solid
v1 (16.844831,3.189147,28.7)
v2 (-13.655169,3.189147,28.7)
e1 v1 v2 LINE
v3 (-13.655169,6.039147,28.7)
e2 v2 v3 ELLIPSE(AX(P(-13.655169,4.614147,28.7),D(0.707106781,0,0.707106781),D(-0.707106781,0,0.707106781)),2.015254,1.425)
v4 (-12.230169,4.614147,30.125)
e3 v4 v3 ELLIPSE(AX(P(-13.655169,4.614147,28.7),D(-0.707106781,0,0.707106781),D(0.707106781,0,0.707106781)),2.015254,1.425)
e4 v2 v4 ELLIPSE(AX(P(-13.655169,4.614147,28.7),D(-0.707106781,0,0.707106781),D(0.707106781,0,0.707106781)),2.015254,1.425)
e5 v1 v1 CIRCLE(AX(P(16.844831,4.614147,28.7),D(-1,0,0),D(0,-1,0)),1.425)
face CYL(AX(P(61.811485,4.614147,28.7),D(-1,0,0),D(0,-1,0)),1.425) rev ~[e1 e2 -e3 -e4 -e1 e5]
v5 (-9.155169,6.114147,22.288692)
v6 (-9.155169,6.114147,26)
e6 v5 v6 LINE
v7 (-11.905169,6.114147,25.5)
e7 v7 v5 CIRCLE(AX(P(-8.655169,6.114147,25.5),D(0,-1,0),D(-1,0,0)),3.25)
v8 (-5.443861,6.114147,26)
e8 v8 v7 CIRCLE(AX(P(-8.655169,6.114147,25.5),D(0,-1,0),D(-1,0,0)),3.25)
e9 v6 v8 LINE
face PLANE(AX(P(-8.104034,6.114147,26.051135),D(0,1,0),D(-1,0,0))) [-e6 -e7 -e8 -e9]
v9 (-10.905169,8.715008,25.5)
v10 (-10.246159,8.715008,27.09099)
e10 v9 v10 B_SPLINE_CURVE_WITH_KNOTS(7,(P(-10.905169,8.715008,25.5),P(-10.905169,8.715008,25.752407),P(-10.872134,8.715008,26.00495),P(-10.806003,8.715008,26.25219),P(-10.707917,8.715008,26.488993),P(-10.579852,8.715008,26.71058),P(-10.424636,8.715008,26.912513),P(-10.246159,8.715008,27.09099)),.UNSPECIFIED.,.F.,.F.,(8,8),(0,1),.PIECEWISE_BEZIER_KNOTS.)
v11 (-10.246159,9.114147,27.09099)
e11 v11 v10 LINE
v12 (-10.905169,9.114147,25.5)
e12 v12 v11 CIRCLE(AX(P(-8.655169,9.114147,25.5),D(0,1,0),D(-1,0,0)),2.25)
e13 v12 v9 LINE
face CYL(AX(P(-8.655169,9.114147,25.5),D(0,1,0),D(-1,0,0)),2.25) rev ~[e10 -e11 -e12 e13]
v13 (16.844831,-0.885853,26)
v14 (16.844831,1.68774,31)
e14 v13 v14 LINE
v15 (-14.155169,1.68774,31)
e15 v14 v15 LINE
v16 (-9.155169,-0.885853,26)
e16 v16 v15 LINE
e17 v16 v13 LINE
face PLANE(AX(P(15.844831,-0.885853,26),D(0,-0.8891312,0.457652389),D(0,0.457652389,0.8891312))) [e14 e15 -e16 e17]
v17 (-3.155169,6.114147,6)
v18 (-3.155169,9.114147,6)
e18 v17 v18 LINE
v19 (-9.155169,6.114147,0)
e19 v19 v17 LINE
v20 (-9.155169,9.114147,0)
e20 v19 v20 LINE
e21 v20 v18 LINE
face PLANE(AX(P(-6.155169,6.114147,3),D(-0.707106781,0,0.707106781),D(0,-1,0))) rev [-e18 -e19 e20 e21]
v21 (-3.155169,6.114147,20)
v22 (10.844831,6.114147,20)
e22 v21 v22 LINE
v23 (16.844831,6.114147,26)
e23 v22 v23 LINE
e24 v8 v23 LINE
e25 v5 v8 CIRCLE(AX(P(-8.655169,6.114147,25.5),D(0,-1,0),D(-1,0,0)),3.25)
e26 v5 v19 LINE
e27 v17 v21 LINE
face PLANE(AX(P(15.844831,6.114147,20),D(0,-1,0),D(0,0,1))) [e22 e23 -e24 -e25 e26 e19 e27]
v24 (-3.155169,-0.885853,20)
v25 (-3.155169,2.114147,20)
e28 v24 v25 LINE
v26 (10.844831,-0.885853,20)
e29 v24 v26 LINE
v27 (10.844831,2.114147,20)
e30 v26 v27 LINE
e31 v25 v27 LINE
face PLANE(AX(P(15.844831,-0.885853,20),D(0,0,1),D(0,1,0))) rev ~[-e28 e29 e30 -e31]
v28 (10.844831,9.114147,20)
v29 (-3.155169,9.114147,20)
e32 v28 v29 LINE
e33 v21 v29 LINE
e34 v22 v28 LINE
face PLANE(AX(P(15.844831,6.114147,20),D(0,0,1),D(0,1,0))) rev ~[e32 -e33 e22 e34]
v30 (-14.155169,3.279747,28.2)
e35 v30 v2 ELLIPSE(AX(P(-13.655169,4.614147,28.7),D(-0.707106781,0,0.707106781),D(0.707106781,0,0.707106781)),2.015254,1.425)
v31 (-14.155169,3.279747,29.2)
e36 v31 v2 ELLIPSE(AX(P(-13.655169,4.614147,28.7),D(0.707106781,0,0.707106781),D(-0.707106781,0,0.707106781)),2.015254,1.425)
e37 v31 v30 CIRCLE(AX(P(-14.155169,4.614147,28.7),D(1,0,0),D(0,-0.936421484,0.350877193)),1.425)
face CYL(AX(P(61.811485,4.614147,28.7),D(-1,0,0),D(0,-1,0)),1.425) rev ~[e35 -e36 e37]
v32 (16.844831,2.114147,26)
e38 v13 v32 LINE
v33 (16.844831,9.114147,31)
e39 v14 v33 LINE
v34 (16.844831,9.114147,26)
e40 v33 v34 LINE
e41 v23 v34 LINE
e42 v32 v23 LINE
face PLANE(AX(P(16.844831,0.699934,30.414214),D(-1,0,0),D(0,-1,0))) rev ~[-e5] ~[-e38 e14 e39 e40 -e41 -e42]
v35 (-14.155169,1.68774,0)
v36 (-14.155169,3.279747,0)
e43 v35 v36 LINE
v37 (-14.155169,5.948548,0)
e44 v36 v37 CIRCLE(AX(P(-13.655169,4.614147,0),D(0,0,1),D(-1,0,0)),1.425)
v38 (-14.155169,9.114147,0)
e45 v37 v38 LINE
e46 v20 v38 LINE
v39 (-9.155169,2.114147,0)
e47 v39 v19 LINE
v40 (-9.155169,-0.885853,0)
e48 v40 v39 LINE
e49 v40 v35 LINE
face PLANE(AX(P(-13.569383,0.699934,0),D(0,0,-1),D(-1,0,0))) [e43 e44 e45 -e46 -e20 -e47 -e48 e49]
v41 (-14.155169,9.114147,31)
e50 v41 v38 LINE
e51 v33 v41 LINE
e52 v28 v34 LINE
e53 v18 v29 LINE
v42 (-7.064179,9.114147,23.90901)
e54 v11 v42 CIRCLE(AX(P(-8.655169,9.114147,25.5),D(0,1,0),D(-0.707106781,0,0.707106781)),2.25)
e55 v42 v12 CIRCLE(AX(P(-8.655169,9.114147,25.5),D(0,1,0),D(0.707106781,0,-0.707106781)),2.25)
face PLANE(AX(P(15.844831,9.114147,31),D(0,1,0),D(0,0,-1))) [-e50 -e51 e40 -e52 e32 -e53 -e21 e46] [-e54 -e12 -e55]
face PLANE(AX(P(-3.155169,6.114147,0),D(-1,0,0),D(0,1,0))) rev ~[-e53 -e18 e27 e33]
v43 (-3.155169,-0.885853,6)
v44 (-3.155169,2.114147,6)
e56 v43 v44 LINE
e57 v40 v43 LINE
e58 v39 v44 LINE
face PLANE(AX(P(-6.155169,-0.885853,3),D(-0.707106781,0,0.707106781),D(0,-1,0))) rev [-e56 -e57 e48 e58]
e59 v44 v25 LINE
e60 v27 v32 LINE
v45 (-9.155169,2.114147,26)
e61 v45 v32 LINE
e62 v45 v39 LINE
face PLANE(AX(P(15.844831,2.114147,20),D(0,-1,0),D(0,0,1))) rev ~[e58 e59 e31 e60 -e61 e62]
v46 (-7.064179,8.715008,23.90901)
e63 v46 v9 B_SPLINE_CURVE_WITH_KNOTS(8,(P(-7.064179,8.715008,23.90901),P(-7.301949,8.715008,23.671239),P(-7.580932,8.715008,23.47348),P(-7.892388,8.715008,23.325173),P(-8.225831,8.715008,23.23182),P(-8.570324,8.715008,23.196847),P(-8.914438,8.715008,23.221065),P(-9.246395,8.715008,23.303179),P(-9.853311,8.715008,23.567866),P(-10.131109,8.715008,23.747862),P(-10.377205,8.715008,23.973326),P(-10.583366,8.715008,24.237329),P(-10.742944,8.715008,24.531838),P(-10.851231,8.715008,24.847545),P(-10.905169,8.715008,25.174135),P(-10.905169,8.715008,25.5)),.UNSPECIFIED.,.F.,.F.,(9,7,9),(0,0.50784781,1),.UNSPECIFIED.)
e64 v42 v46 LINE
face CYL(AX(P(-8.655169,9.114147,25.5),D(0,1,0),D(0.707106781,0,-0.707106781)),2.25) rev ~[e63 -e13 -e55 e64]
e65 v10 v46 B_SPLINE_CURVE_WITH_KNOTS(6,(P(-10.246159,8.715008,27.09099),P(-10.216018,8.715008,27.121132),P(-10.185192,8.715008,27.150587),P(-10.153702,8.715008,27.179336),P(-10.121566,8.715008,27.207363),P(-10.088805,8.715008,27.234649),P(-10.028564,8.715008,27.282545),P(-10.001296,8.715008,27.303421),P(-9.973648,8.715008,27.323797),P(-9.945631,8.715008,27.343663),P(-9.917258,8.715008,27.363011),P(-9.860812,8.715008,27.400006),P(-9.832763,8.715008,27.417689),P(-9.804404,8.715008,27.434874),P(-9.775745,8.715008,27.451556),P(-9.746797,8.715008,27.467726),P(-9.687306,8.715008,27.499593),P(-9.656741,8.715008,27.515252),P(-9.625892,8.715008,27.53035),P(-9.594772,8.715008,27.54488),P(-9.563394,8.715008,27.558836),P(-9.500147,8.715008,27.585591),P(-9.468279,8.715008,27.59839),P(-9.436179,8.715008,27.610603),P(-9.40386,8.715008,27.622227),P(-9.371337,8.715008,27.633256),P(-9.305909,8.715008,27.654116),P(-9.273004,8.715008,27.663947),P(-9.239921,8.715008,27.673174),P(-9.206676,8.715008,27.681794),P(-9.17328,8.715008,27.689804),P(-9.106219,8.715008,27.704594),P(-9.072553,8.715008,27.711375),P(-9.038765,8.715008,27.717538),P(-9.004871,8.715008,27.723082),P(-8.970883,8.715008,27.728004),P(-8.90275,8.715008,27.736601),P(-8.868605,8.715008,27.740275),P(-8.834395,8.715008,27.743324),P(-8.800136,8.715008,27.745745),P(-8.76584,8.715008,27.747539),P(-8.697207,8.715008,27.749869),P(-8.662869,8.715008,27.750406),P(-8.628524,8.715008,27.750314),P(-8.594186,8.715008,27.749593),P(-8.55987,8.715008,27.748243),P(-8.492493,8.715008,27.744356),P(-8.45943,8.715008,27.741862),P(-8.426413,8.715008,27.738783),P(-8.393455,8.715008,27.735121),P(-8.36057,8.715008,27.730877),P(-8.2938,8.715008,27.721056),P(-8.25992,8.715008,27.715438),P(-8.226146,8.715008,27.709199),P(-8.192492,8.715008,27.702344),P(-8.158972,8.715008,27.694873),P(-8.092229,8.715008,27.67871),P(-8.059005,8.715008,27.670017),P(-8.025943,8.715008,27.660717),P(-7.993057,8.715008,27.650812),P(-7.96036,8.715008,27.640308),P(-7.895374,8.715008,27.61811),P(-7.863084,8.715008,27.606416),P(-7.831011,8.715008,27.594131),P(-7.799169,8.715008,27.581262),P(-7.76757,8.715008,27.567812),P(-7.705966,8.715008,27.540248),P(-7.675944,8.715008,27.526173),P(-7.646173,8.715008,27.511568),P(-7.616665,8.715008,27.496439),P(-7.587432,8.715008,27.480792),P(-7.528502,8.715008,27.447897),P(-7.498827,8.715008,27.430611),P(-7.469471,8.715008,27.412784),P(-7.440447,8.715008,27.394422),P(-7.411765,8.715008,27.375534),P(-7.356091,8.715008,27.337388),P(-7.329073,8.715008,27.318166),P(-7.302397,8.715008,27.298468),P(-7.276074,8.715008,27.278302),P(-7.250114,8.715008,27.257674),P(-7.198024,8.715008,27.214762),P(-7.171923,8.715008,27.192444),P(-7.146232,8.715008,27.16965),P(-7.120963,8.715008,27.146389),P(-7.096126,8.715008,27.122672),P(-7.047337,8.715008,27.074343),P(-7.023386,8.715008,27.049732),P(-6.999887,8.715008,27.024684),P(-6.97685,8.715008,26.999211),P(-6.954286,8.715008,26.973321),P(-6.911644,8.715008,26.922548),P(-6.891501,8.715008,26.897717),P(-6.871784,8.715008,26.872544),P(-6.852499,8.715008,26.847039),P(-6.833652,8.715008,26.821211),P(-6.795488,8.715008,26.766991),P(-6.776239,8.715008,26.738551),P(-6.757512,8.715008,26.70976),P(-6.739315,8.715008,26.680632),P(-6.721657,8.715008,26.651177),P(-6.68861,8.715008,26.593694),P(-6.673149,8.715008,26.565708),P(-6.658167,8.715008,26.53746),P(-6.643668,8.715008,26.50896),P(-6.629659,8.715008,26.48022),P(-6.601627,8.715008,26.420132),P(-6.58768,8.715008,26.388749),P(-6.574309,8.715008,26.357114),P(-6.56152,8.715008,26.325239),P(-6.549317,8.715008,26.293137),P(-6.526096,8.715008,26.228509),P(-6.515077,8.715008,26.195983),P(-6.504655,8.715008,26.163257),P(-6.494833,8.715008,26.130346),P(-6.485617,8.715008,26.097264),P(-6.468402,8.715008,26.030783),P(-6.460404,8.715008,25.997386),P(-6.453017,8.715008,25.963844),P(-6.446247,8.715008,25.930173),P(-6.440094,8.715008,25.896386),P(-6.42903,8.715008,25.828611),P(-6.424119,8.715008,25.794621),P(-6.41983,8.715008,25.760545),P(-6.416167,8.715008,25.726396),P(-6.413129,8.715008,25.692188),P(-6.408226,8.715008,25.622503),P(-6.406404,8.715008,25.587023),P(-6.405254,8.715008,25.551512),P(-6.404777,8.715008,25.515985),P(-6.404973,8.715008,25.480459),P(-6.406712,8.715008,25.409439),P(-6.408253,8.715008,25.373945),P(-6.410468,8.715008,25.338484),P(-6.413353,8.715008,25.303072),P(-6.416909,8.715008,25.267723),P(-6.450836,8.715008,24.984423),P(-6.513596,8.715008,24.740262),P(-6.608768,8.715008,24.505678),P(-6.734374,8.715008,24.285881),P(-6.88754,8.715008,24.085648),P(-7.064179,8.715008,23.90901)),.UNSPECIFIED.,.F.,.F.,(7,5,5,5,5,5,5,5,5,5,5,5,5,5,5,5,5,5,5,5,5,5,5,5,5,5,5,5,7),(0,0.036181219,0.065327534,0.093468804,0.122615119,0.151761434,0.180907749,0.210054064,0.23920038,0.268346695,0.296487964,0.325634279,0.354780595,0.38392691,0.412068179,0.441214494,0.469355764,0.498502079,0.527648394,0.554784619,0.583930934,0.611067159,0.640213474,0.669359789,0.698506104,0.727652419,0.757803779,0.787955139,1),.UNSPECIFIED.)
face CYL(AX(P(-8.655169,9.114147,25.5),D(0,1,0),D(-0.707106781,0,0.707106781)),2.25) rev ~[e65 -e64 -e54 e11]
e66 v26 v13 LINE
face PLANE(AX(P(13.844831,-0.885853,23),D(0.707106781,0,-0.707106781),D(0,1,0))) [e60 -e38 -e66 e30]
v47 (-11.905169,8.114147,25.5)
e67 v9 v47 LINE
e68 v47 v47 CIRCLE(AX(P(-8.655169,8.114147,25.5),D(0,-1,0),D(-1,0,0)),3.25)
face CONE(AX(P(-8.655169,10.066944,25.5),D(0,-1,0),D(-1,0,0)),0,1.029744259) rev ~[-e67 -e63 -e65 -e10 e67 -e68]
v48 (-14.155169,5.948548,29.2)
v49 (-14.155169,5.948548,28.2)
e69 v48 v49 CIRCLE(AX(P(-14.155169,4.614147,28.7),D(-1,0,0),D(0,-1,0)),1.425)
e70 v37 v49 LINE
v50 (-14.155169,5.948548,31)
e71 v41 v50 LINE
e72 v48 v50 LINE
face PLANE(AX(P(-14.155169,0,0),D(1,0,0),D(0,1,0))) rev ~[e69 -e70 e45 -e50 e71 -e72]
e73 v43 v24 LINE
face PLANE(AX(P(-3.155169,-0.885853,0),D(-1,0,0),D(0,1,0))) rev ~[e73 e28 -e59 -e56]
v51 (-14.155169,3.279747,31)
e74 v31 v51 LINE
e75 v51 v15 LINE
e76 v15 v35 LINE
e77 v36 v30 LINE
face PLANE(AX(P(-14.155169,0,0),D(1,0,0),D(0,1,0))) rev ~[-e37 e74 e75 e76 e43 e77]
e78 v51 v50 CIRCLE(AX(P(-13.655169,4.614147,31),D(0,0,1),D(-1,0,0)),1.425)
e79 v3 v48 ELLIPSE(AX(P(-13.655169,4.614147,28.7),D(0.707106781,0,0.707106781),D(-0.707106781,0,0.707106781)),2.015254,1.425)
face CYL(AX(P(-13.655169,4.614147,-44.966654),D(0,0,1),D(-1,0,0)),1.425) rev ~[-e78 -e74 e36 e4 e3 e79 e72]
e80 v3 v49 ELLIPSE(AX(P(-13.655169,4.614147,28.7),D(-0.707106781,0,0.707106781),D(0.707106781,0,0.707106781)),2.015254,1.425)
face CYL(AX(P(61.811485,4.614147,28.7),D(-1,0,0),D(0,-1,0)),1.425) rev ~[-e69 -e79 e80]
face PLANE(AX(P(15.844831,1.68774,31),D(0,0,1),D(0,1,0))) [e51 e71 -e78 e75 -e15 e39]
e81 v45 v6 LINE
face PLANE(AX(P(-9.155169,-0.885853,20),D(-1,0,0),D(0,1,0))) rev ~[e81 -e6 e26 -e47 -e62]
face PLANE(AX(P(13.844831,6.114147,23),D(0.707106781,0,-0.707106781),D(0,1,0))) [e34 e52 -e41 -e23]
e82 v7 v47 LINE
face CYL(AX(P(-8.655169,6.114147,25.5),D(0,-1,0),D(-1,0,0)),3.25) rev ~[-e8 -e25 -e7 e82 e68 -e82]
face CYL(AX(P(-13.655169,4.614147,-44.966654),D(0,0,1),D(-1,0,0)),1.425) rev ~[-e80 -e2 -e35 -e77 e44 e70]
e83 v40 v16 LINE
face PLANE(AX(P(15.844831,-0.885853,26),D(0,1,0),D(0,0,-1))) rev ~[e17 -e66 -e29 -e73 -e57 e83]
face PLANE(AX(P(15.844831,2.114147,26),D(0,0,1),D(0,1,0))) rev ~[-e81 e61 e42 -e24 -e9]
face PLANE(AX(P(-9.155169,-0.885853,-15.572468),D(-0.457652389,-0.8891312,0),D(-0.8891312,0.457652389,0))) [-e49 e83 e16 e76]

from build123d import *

# Parameters (mm, degrees)
F1_DEPTH      = 20
F2_W          = 7
F2_H          = 20
F3_DEPTH      = 2
F5_DEPTH      = 6
F6_W          = 3
F6_H          = 6
F7_DEPTH      = 25
F8_DEPTH      = 3
F12_DEPTH     = 2
F13_DEPTH     = 11
F14_T4_DEPTH  = 29
F14_T10_DEPTH = 28
F14_T17_DEPTH = 38.2867319519
F14_T24_DEPTH = 39.2867319519
F15_T1_DEPTH  = 61.1449358039
F15_T3_DEPTH  = 60.1449358039
F16_DEPTH     = 1
F17_SIZE      = 6
F20_D         = 2.85
F20_ON_F18_D  = 2.85
F22_DEPTH     = 3
F24_D         = 6.5
F24_DEPTH     = 2
F24_TIP       = 1.9527970118


# Not quite as in the source:
# - a fillet or chamfer that OpenCascade refuses, or shapes differently, is made with other operations: its cross-section is extruded or revolved along the edge and cut away or added


with BuildPart() as f1:
    # F0 (on Top) → F1 (new body)
    with BuildSketch(Plane.XY):
        Polygon((-3.1551690071, 9.1141472052), (-12.1551690071, 9.1141472052), (-12.1551690071, -0.8858527948), (-3.1551690071, -0.8858527948), (-3.1551690071, 2.1141472052), (-9.1551690071, 2.1141472052), (-9.1551690071, 6.1141472052), (-3.1551690071, 6.1141472052), align=None)
    extrude(amount=F1_DEPTH)

    # F2 (on face) → F3 (join)
    with BuildSketch(Plane(origin=(-12.1551690071, 0, 0), x_dir=(0, -1, 0), z_dir=(-1, 0, 0))):
        with Locations((-5.6141472052, 10)):
            Rectangle(F2_W, F2_H)
    extrude(amount=F3_DEPTH)

    # F4 (on face) → F5 (join)
    with BuildSketch(Plane.XY.offset(20)):
        Polygon((-12.1345976368, 9.1141472052), (-12.1551690071, 2.1141472052), (-12.1551690071, -0.8858527948), (-9.1551690071, -0.8858527948), (-9.1551690071, 2.1141472052), (-9.1551690071, 6.1141472052), (-9.1551690071, 9.1141472052), align=None)
    extrude(amount=F5_DEPTH)

    # F6 (on face) → F7 (join)
    with BuildSketch(Plane.YZ.offset(-9.1551690071)):
        with Locations((7.6141472052, 23)):
            Rectangle(F6_W, F6_H)
        with Locations((0.6141472052, 23)):
            Rectangle(F6_W, F6_H)
        Polygon((-0.8858527948, 26), (2.1141472052, 26), (6.1141472052, 26), (9.1141472052, 26), (9.1141472052, 29), (-0.8858527948, 29), align=None)
    extrude(amount=F7_DEPTH)

    # F8 (add): a face of the model
    f8_faces = [f1.faces().sort_by_distance(p)[0] for p in [
        (-10.6515768532, 4.1077318265, 26),
    ]]
    extrude(f8_faces, amount=F8_DEPTH)

    # F9: union 

    # F10: union 

    # F11 (on face) → F12 (join)
    with BuildSketch(Plane.XY.offset(29)):
        Polygon((-12.1345976368, 9.1141472052), (-12.1551690071, 2.1141472052), (15.8448309929, 2.1141472052), (15.8448309929, 9.1141472052), align=None)
    extrude(amount=F12_DEPTH)

    # F4 (on face) → F13 (join)
    with BuildSketch(Plane.XY.offset(20)):
        Polygon((-14.1551690071, 2.1141472052), (-12.1551690071, 2.1141472052), (-12.1345976368, 9.1141472052), (-14.1551690071, 9.1141472052), align=None)
    extrude(amount=F13_DEPTH)

    # F14: chamfer of 4 on 2 edges, made by hand


with BuildPart() as f14_tool2:
    # F14_s3 → F14_t4 (new body)
    with BuildSketch(Plane.XY):
        Polygon((-12.1551690071, -1.8858527948), (-16.1551690071, 2.1141472052), (-12.1551690071, 2.1141472052), align=None)
    extrude(amount=F14_T4_DEPTH)

    split(bisect_by=Plane.XZ.offset(0.8858527948), keep=Keep.BOTTOM)

    split(bisect_by=Plane.YZ.offset(-14.1551690071), keep=Keep.TOP)


with BuildPart() as f1_1:
    add(f1.part)

    # F14_t1: union F14_tool2
    add(f14_tool2.part)


with BuildPart() as f14_tool8:
    # F14_s9 → F14_t10 (new body)
    with BuildSketch(Plane.YZ.offset(-12.1551690071)):
        Polygon((-1.8858527948, 29), (2.1141472052, 33), (2.1141472052, 29), align=None)
    extrude(amount=F14_T10_DEPTH)

    split(bisect_by=Plane.XZ.offset(0.8858527948), keep=Keep.BOTTOM)

    split(bisect_by=Plane.XY.offset(31), keep=Keep.BOTTOM)


with BuildPart() as f1_2:
    add(f1_1.part)

    # F14_t7: union F14_tool8
    add(f14_tool8.part)


with BuildPart() as f14_tool15:
    # F14_s16 → F14_t17 (new body)
    with BuildSketch(Plane.YZ.offset(-22.4419009589)):
        Polygon((-1.8858527948, 29), (2.1141472052, 33), (2.1141472052, 29), align=None)
    extrude(amount=F14_T17_DEPTH)

    split(bisect_by=Plane.XZ.offset(0.8858527948), keep=Keep.BOTTOM)

    split(bisect_by=Plane.YZ.offset(-12.1551690071), keep=Keep.BOTTOM)

    split(bisect_by=Plane.YZ.offset(-14.1551690071), keep=Keep.TOP)

    split(bisect_by=Plane.XY.offset(31), keep=Keep.BOTTOM)


with BuildPart() as f14_tool22:
    # F14_s23 → F14_t24 (new body)
    with BuildSketch(Plane.XY):
        Polygon((-12.1551690071, -1.8858527948), (-16.1551690071, 2.1141472052), (-12.1551690071, 2.1141472052), align=None)
    extrude(amount=F14_T24_DEPTH)

    split(bisect_by=Plane.XZ.offset(0.8858527948), keep=Keep.BOTTOM)

    split(bisect_by=Plane.XY.offset(29), keep=Keep.TOP)

    split(bisect_by=Plane.YZ.offset(-14.1551690071), keep=Keep.TOP)

    split(bisect_by=Plane.XY.offset(31), keep=Keep.BOTTOM)


with BuildPart() as f14_tool15_1:
    add(f14_tool15.part)

    # F14_t29: intersect F14_tool22
    add(f14_tool22.part, mode=Mode.INTERSECT)


with BuildPart() as f1_3:
    add(f1_2.part)

    # F14_t13: union F14_tool15
    add(f14_tool15_1.part)

    # F15: chamfer of 4 x 6 on 2 edges, made by hand

    # F15_s2 → F15_t1 (cut)
    with BuildSketch(Plane.XY.offset(-15.5724679019)):
        Polygon((-9.1551690071, -0.8858527948), (-17.3978096942, 3.3567878923), (-13.1551690071, -0.8858527948), align=None)
    extrude(amount=F15_T1_DEPTH, mode=Mode.SUBTRACT)

    # F15_s4 → F15_t3 (cut)
    with BuildSketch(Plane.YZ.offset(-28.7276369091)):
        Polygon((-0.8858527948, 26), (3.3567878923, 34.2426406871), (-0.8858527948, 30), align=None)
    extrude(amount=F15_T3_DEPTH, mode=Mode.SUBTRACT)

    # F16 (add): a face of the model
    f16_faces = [f1_3.faces().sort_by_distance(p)[0] for p in [
        (15.8448309929, 6.2628078927, 23),
    ]]
    extrude(f16_faces, amount=F16_DEPTH)

    # F17
    f17_edges = [f1_3.edges().sort_by_distance(p)[0] for p in [
        (-3.155169, 0.614147, 0),
        (-3.155169, 7.614147, 0),
        (16.844831, 0.614147, 20),
        (16.844831, 7.614147, 20),
    ]]
    chamfer(f17_edges, length=F17_SIZE)

    # F20 (through all)
    with Locations(Plane(origin=(0, 0, 0), x_dir=(1, 0, 0), z_dir=(0, 0, -1))):
        with Locations((-13.6551690071, -4.6141472052)):
            Hole(F20_D / 2)

    # F20 on F18 (through all)
    with Locations(Plane.YZ.offset(16.8448309929)):
        with Locations((4.6141472052, 28.7)):
            Hole(F20_ON_F18_D / 2)

    # F21 (on face) → F22 (cut)
    with BuildSketch(Plane(origin=(0, 9.1141472052, 0), x_dir=(-1, 0, 0), z_dir=(0, 1, 0))):
        with BuildLine():
            ThreePointArc((10.2461592647, 27.0909902577), (7.0641787494, 27.0909902577), (7.0641787494, 23.9090097423))
            Line((7.0641787494, 23.9090097423), (10.2461592647, 27.0909902577))
        make_face()
        with BuildLine():
            Line((10.2461592647, 27.0909902577), (7.0641787494, 23.9090097423))
            ThreePointArc((7.0641787494, 23.9090097423), (9.5162067299, 23.4212710518), (10.9051690071, 25.5))
            ThreePointArc((10.9051690071, 25.5), (10.7338979552, 26.3610377228), (10.2461592647, 27.0909902577))
        make_face()
    extrude(amount=-F22_DEPTH, mode=Mode.SUBTRACT)

    # F24 (one way)
    with BuildSketch(Plane(origin=(0, 6.1141472052, 0), x_dir=(-1, 0, 0), z_dir=(0, -1, 0))):
        with Locations((8.6551690071, -25.5)):
            Circle(F24_D / 2)
    extrude(amount=-F24_DEPTH, mode=Mode.SUBTRACT)
    with Locations(Plane(origin=(0, 6.1141472052, 0), x_dir=(-1, 0, 0), z_dir=(0, -1, 0))):
        with Locations((8.6551690071, -25.5)):
            with Locations((0, 0, -(F24_DEPTH + F24_TIP / 2))):  # 118° drill point
                Cone(0, F24_D / 2, F24_TIP, mode=Mode.SUBTRACT)


solid = f1_3.part
